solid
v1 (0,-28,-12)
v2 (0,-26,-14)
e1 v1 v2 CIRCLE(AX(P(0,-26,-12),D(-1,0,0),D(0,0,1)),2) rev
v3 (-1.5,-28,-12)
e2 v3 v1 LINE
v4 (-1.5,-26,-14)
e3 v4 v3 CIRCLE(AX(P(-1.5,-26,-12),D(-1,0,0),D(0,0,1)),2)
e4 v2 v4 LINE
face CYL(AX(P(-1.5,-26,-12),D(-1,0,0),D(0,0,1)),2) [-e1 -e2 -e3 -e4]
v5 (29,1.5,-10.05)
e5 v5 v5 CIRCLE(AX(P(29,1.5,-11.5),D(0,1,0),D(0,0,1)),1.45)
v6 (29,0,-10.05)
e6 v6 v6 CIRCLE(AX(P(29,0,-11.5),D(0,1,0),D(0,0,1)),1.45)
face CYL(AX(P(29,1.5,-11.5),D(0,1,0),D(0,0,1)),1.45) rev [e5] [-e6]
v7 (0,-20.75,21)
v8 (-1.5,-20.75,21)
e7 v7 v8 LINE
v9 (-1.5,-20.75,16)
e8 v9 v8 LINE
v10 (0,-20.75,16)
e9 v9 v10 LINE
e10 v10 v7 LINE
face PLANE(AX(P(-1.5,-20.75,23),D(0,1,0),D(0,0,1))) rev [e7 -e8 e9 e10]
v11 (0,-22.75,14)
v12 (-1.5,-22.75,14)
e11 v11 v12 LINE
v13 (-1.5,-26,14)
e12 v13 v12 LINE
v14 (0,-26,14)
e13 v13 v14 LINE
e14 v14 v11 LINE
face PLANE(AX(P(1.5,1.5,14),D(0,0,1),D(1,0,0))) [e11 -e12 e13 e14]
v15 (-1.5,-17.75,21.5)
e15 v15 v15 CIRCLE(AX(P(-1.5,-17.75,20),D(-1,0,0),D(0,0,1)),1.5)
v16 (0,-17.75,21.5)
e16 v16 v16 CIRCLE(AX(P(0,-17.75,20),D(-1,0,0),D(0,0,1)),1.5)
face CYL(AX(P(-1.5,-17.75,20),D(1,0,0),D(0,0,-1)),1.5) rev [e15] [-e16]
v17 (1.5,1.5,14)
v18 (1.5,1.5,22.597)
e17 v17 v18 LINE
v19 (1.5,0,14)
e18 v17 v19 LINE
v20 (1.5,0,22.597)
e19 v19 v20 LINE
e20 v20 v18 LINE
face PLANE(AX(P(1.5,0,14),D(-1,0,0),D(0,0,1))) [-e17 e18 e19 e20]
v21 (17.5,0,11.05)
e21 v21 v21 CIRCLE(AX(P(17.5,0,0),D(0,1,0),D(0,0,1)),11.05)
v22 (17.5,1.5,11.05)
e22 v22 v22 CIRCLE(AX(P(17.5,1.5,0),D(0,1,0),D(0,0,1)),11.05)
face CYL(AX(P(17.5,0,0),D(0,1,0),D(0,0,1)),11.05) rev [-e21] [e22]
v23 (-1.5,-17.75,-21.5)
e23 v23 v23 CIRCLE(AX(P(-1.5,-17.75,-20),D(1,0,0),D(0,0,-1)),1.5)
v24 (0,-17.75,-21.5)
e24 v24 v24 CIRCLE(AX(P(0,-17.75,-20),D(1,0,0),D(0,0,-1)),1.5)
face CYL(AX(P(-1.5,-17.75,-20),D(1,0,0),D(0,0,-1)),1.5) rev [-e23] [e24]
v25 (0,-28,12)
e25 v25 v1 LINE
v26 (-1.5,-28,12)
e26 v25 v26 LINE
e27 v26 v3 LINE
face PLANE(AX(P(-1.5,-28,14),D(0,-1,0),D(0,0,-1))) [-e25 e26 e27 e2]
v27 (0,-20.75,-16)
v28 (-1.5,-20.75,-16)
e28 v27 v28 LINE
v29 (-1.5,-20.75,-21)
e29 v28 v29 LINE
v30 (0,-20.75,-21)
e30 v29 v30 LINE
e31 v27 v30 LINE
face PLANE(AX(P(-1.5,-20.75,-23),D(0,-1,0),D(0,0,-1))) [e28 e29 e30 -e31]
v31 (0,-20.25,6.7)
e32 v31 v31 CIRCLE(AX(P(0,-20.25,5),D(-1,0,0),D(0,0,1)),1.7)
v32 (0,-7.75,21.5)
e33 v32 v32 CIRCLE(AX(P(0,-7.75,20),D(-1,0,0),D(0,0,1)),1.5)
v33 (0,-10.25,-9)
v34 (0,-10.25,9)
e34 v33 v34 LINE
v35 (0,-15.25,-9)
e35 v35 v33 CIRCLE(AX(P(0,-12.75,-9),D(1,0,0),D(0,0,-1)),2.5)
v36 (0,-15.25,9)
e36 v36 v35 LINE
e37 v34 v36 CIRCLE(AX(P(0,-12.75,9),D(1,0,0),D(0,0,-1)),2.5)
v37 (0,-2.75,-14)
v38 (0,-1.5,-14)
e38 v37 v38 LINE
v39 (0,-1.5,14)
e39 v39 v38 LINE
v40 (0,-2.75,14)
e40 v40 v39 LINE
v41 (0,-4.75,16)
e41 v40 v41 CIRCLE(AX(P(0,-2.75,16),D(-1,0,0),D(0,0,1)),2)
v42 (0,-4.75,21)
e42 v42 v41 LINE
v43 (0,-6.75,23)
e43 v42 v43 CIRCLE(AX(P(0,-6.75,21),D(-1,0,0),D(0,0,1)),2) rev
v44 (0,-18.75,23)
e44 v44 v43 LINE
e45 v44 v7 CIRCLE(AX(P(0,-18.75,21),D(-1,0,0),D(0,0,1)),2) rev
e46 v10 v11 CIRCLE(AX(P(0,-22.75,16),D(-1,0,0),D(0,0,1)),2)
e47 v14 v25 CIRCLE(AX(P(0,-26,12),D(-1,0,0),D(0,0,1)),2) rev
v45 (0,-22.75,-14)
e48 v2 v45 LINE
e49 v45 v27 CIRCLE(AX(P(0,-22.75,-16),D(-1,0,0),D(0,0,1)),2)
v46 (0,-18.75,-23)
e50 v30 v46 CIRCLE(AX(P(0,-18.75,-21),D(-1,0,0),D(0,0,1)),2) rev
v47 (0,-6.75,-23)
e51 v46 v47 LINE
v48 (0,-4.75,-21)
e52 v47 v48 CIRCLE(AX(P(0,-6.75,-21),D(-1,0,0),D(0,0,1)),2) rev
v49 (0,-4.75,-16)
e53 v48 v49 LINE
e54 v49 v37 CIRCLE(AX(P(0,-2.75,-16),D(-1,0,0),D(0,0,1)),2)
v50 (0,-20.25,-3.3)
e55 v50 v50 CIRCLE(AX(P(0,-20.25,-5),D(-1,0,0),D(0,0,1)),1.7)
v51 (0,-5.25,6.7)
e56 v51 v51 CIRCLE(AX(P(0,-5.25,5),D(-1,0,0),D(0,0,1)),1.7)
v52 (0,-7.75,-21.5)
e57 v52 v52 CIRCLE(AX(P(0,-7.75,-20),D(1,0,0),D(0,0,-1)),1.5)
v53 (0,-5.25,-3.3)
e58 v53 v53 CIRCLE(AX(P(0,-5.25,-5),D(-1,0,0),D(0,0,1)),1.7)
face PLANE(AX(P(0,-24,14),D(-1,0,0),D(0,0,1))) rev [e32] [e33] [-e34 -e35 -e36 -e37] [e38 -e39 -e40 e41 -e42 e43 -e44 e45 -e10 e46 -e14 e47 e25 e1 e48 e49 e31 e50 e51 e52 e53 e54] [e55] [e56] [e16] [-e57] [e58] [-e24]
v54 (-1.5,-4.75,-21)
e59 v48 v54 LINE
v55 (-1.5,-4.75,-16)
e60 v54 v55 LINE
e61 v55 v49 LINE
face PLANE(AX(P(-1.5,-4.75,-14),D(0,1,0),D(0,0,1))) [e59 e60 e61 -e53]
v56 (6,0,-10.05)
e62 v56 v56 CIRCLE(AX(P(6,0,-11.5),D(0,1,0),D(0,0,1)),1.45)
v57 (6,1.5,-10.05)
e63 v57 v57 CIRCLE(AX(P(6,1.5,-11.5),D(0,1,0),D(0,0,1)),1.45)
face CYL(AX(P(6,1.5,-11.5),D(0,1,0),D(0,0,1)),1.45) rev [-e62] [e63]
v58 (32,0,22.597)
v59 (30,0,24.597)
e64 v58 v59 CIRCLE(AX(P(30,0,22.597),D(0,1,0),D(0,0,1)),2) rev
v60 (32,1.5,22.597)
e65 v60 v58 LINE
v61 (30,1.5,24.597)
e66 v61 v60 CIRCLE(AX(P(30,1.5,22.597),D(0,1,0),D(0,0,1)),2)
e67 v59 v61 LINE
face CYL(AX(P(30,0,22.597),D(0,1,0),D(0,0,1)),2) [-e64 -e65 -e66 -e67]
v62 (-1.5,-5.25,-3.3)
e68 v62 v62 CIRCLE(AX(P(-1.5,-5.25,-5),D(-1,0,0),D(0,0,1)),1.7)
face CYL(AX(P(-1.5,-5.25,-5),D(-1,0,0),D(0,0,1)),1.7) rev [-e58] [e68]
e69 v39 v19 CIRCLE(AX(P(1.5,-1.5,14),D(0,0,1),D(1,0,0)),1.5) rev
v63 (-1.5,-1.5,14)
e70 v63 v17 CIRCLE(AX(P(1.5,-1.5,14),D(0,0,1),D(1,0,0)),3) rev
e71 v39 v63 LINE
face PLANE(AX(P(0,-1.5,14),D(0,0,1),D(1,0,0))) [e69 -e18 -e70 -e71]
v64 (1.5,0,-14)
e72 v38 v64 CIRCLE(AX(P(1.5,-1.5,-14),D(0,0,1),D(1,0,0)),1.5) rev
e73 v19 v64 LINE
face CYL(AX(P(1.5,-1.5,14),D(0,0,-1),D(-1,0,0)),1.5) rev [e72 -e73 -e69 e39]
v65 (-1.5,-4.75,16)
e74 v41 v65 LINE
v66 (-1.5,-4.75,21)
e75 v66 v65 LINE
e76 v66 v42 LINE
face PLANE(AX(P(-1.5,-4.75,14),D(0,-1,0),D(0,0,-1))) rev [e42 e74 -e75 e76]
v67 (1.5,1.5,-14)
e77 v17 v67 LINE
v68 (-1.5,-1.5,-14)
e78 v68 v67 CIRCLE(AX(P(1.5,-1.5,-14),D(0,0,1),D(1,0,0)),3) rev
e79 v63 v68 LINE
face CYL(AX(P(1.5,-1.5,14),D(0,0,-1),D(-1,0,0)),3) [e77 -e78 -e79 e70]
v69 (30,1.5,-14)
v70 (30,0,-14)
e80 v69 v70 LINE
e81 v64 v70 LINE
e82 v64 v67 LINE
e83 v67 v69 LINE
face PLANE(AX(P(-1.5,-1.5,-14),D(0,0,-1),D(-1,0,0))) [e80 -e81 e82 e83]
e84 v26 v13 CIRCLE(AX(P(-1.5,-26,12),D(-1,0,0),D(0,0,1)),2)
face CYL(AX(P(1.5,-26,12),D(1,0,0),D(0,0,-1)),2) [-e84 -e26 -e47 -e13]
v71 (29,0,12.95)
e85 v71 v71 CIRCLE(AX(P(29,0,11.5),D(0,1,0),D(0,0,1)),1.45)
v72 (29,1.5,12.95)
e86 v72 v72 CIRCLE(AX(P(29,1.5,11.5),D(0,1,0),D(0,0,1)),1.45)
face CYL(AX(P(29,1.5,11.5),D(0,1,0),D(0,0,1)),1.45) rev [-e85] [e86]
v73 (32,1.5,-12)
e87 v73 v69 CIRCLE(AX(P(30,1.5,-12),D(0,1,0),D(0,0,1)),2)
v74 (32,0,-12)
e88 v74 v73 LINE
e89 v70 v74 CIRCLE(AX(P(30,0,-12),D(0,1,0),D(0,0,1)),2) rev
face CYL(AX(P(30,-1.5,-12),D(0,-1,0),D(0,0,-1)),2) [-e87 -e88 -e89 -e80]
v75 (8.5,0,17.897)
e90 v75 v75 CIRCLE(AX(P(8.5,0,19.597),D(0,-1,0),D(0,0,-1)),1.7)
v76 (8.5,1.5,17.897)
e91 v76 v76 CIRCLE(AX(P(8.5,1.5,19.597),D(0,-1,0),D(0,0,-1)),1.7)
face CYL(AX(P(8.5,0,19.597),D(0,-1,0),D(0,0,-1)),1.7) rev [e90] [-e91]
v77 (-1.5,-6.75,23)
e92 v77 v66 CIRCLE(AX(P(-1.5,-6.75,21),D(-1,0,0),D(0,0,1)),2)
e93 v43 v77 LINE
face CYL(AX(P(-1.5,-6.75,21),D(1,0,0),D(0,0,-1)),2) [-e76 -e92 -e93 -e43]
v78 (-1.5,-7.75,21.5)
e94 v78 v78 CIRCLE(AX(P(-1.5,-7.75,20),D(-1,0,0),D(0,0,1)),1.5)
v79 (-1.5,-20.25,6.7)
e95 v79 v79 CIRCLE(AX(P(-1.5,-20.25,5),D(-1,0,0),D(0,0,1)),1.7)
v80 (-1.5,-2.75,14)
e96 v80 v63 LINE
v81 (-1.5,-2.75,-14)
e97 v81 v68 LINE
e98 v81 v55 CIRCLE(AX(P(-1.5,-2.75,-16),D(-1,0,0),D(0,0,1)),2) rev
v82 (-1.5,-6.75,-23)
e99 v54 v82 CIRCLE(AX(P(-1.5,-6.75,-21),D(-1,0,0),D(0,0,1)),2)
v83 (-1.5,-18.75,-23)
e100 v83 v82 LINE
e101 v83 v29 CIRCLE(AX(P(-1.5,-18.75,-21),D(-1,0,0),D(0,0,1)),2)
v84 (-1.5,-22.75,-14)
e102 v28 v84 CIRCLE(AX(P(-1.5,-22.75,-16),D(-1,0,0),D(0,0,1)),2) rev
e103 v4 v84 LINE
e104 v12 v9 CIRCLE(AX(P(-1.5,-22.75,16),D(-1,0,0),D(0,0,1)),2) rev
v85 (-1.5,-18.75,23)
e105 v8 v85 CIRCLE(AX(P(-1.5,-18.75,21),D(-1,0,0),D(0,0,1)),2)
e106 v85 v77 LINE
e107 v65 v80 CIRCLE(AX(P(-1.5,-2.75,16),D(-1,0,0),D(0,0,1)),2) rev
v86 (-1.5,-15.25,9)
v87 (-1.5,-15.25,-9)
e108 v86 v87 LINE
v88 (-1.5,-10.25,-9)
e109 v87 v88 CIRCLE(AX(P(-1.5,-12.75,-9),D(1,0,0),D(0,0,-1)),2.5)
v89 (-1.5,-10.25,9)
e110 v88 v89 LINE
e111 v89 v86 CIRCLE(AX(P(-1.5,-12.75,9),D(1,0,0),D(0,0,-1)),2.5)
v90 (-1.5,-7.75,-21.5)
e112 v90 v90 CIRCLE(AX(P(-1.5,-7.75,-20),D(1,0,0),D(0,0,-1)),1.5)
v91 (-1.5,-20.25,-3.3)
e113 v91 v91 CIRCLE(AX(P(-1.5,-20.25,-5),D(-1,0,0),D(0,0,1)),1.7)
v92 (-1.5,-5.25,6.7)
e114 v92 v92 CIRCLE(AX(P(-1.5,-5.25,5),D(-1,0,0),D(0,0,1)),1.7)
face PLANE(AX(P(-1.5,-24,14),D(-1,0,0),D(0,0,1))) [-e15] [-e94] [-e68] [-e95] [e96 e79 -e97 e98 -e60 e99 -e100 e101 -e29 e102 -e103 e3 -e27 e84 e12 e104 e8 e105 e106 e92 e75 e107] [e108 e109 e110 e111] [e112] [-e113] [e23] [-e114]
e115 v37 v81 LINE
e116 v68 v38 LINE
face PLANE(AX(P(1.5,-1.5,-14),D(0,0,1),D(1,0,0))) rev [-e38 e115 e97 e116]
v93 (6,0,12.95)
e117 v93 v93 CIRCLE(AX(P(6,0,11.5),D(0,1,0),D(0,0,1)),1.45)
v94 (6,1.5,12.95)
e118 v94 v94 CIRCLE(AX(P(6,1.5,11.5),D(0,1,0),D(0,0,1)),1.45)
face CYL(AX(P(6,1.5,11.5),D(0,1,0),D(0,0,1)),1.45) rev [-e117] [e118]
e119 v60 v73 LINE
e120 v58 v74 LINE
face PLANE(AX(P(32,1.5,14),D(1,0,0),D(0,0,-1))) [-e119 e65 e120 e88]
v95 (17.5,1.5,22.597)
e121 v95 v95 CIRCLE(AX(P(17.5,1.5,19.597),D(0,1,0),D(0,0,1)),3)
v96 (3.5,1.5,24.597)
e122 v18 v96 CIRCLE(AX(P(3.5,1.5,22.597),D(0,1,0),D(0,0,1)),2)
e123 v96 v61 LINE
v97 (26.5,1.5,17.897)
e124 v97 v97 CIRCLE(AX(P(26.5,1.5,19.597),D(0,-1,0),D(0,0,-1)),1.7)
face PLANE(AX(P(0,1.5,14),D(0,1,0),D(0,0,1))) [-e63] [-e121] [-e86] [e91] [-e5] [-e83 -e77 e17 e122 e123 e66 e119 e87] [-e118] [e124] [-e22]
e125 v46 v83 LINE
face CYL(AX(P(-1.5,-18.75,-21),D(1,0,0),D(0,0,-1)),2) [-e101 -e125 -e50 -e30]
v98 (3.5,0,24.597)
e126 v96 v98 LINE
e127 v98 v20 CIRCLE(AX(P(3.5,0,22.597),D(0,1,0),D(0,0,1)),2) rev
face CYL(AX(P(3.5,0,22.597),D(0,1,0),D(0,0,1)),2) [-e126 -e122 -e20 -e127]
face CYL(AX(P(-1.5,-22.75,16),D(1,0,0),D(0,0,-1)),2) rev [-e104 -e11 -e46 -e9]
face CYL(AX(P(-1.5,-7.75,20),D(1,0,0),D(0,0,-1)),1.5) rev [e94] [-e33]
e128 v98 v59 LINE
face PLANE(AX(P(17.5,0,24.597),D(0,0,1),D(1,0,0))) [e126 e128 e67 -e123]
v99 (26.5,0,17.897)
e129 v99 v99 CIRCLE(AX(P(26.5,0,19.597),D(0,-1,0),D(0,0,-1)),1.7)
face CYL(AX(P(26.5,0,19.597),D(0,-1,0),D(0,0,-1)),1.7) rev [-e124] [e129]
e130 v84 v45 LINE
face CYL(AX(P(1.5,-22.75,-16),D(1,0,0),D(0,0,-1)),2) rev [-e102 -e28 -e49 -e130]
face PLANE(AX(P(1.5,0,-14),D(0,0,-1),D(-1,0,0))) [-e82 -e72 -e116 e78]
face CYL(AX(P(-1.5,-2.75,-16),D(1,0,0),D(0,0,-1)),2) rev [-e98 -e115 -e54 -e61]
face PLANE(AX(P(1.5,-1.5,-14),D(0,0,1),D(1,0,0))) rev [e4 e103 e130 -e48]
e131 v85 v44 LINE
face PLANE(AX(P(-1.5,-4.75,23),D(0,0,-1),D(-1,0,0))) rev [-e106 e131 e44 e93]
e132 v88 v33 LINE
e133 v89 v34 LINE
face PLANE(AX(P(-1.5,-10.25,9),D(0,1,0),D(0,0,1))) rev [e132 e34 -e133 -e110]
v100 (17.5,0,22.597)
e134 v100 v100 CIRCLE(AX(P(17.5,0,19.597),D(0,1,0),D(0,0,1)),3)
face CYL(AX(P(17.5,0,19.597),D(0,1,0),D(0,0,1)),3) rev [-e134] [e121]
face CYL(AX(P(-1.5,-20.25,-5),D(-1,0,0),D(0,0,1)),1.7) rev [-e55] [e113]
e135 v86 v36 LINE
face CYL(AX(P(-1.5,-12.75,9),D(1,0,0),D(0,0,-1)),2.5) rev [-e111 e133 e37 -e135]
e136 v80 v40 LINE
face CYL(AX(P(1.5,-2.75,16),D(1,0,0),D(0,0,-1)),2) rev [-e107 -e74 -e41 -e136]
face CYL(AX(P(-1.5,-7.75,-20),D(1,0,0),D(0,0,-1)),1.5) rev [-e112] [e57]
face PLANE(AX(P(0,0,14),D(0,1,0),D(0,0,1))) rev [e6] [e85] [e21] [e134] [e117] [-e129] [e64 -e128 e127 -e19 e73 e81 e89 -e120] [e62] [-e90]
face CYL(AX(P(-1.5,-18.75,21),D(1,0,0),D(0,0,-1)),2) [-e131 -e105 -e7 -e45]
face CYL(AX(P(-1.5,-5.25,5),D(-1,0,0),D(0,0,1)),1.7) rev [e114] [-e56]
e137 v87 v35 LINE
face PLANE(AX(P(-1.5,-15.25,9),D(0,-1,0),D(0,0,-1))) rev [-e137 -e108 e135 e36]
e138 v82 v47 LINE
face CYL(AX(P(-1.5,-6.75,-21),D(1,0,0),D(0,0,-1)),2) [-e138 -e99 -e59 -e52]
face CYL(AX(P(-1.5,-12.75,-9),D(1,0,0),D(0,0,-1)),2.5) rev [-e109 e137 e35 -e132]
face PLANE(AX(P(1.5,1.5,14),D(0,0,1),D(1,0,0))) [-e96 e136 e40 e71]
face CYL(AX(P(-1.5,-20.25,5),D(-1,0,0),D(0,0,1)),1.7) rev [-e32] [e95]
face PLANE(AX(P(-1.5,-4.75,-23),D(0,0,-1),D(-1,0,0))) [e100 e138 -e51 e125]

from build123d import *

# Parameters (mm, degrees)
BASE_FLANGE1_DEPTH     = 14
M3_CLEARANCE_HOLE1_D   = 3.4
M2_5_CLEARANCE_HOLE1_D = 2.9
SKETCH10_R             = 11.05
CUT_EXTRUDE1_DEPTH     = 10
SKETCH11_R             = 3
BOSS_EXTRUDE1_DEPTH    = 1.5
M3_CLEARANCE_HOLE2_D   = 3.4
SKETCH14_W             = 9
SKETCH14_H             = 16
SKETCH14_R             = 1.5
BOSS_EXTRUDE2_DEPTH    = 1.5
SKETCH15_W             = 28
SKETCH15_H             = 4
BOSS_EXTRUDE3_DEPTH    = 1.5
FILLET1_R              = 2
CUT_EXTRUDE2_DEPTH     = 10


# Sheet-metal steps are written as plain solids
with BuildPart() as part:
    # Sketch1 → Base-Flange1 (new, symmetric)
    with BuildSketch(Plane.XY):
        with BuildLine():
            Line((0, -24), (0, -1.5))
            ThreePointArc((0, -1.5), (0.439339828, -0.439339828), (1.5, 0))
            Line((1.5, 0), (32, 0))
            Line((32, 0), (32, 1.5))
            Line((32, 1.5), (1.5, 1.5))
            ThreePointArc((1.5, 1.5), (-0.621320344, 0.621320344), (-1.5, -1.5))
            Line((-1.5, -1.5), (-1.5, -24))
            Line((-1.5, -24), (0, -24))
        make_face()
    extrude(amount=BASE_FLANGE1_DEPTH, both=True)

    # M3 Clearance Hole1 (through all)
    with Locations(Plane.ZY.offset(1.5)):
        with Locations((-5, -5.25), (-5, -20.25), (5, -5.25), (5, -20.25)):
            Hole(M3_CLEARANCE_HOLE1_D / 2)

    # M2.5 Clearance Hole1 (through all)
    with Locations(Plane(origin=(0, 1.5, 0), x_dir=(1, 0, 0), z_dir=(0, 1, 0))):
        with Locations((29, 11.5), (29, -11.5), (6, -11.5), (6, 11.5)):
            Hole(M2_5_CLEARANCE_HOLE1_D / 2)

    # Sketch10 → Cut-Extrude1 (cut)
    with BuildSketch(Plane(origin=(0, 1.5, 0), x_dir=(1, 0, 0), z_dir=(0, 1, 0))):
        with Locations(Location((17.5, 0, 0), (0, 0, 270))):
            Circle(SKETCH10_R)
    extrude(amount=-CUT_EXTRUDE1_DEPTH, mode=Mode.SUBTRACT)

    # Sketch11 → Boss-Extrude1 (add)
    with BuildSketch(Plane(origin=(0, 1.5, 0), x_dir=(1, 0, 0), z_dir=(0, 1, 0))):
        Polygon((32, -14), (1.5, -14), (1.5, -24.597), (17.5, -24.597), (32, -24.597), align=None)
        with Locations(Location((17.5, -19.597, 0), (0, 0, 270))):
            Circle(SKETCH11_R, mode=Mode.SUBTRACT)
    extrude(amount=-BOSS_EXTRUDE1_DEPTH)

    # M3 Clearance Hole2 (through all)
    with Locations(Plane(origin=(0, 0, 0), x_dir=(-1, 0, 0), z_dir=(0, -1, 0))):
        with Locations((-26.5, -19.597), (-8.5, -19.597)):
            Hole(M3_CLEARANCE_HOLE2_D / 2)

    # Sketch14 → Boss-Extrude2 (add)
    with BuildSketch(Plane(origin=(0, 0, 0), x_dir=(0, 0, -1), z_dir=(1, 0, 0))):
        with Locations((18.5, -12.75)):
            Rectangle(SKETCH14_W, SKETCH14_H)
        with Locations((20, -7.75)):
            Circle(SKETCH14_R, mode=Mode.SUBTRACT)
        with Locations((20, -17.75)):
            Circle(SKETCH14_R, mode=Mode.SUBTRACT)
    boss_extrude2 = extrude(amount=-BOSS_EXTRUDE2_DEPTH)

    # Mirror1: Boss-Extrude2 across plane
    add(boss_extrude2.mirror(Plane.XY))

    # Sketch15 → Boss-Extrude3 (add)
    with BuildSketch(Plane(origin=(0, 0, 0), x_dir=(0, 0, -1), z_dir=(1, 0, 0))):
        with Locations((0, -26)):
            Rectangle(SKETCH15_W, SKETCH15_H)
    extrude(amount=-BOSS_EXTRUDE3_DEPTH)

    # Fillet1
    fillet1_edges = [part.edges().sort_by_distance(p)[0] for p in [
        (-0.75, -20.75, -14),
        (-0.75, -4.75, -14),
        (-0.75, -4.75, -23),
        (-0.75, -20.75, -23),
        (-0.75, -4.75, 14),
        (-0.75, -20.75, 14),
        (-0.75, -20.75, 23),
        (-0.75, -4.75, 23),
        (-0.75, -28, 14),
        (-0.75, -28, -14),
        (1.5, 0.75, 24.597),
        (32, 0.75, 24.597),
        (32, 0.75, -14),
    ]]
    fillet(fillet1_edges, radius=FILLET1_R)

    # Sketch16 → Cut-Extrude2 (cut)
    with BuildSketch(Plane(origin=(0, 0, 0), x_dir=(0, 0, -1), z_dir=(1, 0, 0))):
        with BuildLine():
            Line((-9, -10.25), (9, -10.25))
            ThreePointArc((9, -10.25), (11.5, -12.75), (9, -15.25))
            Line((9, -15.25), (-9, -15.25))
            ThreePointArc((-9, -15.25), (-11.5, -12.75), (-9, -10.25))
        make_face()
    extrude(amount=-CUT_EXTRUDE2_DEPTH, mode=Mode.SUBTRACT)


solid = part.part
